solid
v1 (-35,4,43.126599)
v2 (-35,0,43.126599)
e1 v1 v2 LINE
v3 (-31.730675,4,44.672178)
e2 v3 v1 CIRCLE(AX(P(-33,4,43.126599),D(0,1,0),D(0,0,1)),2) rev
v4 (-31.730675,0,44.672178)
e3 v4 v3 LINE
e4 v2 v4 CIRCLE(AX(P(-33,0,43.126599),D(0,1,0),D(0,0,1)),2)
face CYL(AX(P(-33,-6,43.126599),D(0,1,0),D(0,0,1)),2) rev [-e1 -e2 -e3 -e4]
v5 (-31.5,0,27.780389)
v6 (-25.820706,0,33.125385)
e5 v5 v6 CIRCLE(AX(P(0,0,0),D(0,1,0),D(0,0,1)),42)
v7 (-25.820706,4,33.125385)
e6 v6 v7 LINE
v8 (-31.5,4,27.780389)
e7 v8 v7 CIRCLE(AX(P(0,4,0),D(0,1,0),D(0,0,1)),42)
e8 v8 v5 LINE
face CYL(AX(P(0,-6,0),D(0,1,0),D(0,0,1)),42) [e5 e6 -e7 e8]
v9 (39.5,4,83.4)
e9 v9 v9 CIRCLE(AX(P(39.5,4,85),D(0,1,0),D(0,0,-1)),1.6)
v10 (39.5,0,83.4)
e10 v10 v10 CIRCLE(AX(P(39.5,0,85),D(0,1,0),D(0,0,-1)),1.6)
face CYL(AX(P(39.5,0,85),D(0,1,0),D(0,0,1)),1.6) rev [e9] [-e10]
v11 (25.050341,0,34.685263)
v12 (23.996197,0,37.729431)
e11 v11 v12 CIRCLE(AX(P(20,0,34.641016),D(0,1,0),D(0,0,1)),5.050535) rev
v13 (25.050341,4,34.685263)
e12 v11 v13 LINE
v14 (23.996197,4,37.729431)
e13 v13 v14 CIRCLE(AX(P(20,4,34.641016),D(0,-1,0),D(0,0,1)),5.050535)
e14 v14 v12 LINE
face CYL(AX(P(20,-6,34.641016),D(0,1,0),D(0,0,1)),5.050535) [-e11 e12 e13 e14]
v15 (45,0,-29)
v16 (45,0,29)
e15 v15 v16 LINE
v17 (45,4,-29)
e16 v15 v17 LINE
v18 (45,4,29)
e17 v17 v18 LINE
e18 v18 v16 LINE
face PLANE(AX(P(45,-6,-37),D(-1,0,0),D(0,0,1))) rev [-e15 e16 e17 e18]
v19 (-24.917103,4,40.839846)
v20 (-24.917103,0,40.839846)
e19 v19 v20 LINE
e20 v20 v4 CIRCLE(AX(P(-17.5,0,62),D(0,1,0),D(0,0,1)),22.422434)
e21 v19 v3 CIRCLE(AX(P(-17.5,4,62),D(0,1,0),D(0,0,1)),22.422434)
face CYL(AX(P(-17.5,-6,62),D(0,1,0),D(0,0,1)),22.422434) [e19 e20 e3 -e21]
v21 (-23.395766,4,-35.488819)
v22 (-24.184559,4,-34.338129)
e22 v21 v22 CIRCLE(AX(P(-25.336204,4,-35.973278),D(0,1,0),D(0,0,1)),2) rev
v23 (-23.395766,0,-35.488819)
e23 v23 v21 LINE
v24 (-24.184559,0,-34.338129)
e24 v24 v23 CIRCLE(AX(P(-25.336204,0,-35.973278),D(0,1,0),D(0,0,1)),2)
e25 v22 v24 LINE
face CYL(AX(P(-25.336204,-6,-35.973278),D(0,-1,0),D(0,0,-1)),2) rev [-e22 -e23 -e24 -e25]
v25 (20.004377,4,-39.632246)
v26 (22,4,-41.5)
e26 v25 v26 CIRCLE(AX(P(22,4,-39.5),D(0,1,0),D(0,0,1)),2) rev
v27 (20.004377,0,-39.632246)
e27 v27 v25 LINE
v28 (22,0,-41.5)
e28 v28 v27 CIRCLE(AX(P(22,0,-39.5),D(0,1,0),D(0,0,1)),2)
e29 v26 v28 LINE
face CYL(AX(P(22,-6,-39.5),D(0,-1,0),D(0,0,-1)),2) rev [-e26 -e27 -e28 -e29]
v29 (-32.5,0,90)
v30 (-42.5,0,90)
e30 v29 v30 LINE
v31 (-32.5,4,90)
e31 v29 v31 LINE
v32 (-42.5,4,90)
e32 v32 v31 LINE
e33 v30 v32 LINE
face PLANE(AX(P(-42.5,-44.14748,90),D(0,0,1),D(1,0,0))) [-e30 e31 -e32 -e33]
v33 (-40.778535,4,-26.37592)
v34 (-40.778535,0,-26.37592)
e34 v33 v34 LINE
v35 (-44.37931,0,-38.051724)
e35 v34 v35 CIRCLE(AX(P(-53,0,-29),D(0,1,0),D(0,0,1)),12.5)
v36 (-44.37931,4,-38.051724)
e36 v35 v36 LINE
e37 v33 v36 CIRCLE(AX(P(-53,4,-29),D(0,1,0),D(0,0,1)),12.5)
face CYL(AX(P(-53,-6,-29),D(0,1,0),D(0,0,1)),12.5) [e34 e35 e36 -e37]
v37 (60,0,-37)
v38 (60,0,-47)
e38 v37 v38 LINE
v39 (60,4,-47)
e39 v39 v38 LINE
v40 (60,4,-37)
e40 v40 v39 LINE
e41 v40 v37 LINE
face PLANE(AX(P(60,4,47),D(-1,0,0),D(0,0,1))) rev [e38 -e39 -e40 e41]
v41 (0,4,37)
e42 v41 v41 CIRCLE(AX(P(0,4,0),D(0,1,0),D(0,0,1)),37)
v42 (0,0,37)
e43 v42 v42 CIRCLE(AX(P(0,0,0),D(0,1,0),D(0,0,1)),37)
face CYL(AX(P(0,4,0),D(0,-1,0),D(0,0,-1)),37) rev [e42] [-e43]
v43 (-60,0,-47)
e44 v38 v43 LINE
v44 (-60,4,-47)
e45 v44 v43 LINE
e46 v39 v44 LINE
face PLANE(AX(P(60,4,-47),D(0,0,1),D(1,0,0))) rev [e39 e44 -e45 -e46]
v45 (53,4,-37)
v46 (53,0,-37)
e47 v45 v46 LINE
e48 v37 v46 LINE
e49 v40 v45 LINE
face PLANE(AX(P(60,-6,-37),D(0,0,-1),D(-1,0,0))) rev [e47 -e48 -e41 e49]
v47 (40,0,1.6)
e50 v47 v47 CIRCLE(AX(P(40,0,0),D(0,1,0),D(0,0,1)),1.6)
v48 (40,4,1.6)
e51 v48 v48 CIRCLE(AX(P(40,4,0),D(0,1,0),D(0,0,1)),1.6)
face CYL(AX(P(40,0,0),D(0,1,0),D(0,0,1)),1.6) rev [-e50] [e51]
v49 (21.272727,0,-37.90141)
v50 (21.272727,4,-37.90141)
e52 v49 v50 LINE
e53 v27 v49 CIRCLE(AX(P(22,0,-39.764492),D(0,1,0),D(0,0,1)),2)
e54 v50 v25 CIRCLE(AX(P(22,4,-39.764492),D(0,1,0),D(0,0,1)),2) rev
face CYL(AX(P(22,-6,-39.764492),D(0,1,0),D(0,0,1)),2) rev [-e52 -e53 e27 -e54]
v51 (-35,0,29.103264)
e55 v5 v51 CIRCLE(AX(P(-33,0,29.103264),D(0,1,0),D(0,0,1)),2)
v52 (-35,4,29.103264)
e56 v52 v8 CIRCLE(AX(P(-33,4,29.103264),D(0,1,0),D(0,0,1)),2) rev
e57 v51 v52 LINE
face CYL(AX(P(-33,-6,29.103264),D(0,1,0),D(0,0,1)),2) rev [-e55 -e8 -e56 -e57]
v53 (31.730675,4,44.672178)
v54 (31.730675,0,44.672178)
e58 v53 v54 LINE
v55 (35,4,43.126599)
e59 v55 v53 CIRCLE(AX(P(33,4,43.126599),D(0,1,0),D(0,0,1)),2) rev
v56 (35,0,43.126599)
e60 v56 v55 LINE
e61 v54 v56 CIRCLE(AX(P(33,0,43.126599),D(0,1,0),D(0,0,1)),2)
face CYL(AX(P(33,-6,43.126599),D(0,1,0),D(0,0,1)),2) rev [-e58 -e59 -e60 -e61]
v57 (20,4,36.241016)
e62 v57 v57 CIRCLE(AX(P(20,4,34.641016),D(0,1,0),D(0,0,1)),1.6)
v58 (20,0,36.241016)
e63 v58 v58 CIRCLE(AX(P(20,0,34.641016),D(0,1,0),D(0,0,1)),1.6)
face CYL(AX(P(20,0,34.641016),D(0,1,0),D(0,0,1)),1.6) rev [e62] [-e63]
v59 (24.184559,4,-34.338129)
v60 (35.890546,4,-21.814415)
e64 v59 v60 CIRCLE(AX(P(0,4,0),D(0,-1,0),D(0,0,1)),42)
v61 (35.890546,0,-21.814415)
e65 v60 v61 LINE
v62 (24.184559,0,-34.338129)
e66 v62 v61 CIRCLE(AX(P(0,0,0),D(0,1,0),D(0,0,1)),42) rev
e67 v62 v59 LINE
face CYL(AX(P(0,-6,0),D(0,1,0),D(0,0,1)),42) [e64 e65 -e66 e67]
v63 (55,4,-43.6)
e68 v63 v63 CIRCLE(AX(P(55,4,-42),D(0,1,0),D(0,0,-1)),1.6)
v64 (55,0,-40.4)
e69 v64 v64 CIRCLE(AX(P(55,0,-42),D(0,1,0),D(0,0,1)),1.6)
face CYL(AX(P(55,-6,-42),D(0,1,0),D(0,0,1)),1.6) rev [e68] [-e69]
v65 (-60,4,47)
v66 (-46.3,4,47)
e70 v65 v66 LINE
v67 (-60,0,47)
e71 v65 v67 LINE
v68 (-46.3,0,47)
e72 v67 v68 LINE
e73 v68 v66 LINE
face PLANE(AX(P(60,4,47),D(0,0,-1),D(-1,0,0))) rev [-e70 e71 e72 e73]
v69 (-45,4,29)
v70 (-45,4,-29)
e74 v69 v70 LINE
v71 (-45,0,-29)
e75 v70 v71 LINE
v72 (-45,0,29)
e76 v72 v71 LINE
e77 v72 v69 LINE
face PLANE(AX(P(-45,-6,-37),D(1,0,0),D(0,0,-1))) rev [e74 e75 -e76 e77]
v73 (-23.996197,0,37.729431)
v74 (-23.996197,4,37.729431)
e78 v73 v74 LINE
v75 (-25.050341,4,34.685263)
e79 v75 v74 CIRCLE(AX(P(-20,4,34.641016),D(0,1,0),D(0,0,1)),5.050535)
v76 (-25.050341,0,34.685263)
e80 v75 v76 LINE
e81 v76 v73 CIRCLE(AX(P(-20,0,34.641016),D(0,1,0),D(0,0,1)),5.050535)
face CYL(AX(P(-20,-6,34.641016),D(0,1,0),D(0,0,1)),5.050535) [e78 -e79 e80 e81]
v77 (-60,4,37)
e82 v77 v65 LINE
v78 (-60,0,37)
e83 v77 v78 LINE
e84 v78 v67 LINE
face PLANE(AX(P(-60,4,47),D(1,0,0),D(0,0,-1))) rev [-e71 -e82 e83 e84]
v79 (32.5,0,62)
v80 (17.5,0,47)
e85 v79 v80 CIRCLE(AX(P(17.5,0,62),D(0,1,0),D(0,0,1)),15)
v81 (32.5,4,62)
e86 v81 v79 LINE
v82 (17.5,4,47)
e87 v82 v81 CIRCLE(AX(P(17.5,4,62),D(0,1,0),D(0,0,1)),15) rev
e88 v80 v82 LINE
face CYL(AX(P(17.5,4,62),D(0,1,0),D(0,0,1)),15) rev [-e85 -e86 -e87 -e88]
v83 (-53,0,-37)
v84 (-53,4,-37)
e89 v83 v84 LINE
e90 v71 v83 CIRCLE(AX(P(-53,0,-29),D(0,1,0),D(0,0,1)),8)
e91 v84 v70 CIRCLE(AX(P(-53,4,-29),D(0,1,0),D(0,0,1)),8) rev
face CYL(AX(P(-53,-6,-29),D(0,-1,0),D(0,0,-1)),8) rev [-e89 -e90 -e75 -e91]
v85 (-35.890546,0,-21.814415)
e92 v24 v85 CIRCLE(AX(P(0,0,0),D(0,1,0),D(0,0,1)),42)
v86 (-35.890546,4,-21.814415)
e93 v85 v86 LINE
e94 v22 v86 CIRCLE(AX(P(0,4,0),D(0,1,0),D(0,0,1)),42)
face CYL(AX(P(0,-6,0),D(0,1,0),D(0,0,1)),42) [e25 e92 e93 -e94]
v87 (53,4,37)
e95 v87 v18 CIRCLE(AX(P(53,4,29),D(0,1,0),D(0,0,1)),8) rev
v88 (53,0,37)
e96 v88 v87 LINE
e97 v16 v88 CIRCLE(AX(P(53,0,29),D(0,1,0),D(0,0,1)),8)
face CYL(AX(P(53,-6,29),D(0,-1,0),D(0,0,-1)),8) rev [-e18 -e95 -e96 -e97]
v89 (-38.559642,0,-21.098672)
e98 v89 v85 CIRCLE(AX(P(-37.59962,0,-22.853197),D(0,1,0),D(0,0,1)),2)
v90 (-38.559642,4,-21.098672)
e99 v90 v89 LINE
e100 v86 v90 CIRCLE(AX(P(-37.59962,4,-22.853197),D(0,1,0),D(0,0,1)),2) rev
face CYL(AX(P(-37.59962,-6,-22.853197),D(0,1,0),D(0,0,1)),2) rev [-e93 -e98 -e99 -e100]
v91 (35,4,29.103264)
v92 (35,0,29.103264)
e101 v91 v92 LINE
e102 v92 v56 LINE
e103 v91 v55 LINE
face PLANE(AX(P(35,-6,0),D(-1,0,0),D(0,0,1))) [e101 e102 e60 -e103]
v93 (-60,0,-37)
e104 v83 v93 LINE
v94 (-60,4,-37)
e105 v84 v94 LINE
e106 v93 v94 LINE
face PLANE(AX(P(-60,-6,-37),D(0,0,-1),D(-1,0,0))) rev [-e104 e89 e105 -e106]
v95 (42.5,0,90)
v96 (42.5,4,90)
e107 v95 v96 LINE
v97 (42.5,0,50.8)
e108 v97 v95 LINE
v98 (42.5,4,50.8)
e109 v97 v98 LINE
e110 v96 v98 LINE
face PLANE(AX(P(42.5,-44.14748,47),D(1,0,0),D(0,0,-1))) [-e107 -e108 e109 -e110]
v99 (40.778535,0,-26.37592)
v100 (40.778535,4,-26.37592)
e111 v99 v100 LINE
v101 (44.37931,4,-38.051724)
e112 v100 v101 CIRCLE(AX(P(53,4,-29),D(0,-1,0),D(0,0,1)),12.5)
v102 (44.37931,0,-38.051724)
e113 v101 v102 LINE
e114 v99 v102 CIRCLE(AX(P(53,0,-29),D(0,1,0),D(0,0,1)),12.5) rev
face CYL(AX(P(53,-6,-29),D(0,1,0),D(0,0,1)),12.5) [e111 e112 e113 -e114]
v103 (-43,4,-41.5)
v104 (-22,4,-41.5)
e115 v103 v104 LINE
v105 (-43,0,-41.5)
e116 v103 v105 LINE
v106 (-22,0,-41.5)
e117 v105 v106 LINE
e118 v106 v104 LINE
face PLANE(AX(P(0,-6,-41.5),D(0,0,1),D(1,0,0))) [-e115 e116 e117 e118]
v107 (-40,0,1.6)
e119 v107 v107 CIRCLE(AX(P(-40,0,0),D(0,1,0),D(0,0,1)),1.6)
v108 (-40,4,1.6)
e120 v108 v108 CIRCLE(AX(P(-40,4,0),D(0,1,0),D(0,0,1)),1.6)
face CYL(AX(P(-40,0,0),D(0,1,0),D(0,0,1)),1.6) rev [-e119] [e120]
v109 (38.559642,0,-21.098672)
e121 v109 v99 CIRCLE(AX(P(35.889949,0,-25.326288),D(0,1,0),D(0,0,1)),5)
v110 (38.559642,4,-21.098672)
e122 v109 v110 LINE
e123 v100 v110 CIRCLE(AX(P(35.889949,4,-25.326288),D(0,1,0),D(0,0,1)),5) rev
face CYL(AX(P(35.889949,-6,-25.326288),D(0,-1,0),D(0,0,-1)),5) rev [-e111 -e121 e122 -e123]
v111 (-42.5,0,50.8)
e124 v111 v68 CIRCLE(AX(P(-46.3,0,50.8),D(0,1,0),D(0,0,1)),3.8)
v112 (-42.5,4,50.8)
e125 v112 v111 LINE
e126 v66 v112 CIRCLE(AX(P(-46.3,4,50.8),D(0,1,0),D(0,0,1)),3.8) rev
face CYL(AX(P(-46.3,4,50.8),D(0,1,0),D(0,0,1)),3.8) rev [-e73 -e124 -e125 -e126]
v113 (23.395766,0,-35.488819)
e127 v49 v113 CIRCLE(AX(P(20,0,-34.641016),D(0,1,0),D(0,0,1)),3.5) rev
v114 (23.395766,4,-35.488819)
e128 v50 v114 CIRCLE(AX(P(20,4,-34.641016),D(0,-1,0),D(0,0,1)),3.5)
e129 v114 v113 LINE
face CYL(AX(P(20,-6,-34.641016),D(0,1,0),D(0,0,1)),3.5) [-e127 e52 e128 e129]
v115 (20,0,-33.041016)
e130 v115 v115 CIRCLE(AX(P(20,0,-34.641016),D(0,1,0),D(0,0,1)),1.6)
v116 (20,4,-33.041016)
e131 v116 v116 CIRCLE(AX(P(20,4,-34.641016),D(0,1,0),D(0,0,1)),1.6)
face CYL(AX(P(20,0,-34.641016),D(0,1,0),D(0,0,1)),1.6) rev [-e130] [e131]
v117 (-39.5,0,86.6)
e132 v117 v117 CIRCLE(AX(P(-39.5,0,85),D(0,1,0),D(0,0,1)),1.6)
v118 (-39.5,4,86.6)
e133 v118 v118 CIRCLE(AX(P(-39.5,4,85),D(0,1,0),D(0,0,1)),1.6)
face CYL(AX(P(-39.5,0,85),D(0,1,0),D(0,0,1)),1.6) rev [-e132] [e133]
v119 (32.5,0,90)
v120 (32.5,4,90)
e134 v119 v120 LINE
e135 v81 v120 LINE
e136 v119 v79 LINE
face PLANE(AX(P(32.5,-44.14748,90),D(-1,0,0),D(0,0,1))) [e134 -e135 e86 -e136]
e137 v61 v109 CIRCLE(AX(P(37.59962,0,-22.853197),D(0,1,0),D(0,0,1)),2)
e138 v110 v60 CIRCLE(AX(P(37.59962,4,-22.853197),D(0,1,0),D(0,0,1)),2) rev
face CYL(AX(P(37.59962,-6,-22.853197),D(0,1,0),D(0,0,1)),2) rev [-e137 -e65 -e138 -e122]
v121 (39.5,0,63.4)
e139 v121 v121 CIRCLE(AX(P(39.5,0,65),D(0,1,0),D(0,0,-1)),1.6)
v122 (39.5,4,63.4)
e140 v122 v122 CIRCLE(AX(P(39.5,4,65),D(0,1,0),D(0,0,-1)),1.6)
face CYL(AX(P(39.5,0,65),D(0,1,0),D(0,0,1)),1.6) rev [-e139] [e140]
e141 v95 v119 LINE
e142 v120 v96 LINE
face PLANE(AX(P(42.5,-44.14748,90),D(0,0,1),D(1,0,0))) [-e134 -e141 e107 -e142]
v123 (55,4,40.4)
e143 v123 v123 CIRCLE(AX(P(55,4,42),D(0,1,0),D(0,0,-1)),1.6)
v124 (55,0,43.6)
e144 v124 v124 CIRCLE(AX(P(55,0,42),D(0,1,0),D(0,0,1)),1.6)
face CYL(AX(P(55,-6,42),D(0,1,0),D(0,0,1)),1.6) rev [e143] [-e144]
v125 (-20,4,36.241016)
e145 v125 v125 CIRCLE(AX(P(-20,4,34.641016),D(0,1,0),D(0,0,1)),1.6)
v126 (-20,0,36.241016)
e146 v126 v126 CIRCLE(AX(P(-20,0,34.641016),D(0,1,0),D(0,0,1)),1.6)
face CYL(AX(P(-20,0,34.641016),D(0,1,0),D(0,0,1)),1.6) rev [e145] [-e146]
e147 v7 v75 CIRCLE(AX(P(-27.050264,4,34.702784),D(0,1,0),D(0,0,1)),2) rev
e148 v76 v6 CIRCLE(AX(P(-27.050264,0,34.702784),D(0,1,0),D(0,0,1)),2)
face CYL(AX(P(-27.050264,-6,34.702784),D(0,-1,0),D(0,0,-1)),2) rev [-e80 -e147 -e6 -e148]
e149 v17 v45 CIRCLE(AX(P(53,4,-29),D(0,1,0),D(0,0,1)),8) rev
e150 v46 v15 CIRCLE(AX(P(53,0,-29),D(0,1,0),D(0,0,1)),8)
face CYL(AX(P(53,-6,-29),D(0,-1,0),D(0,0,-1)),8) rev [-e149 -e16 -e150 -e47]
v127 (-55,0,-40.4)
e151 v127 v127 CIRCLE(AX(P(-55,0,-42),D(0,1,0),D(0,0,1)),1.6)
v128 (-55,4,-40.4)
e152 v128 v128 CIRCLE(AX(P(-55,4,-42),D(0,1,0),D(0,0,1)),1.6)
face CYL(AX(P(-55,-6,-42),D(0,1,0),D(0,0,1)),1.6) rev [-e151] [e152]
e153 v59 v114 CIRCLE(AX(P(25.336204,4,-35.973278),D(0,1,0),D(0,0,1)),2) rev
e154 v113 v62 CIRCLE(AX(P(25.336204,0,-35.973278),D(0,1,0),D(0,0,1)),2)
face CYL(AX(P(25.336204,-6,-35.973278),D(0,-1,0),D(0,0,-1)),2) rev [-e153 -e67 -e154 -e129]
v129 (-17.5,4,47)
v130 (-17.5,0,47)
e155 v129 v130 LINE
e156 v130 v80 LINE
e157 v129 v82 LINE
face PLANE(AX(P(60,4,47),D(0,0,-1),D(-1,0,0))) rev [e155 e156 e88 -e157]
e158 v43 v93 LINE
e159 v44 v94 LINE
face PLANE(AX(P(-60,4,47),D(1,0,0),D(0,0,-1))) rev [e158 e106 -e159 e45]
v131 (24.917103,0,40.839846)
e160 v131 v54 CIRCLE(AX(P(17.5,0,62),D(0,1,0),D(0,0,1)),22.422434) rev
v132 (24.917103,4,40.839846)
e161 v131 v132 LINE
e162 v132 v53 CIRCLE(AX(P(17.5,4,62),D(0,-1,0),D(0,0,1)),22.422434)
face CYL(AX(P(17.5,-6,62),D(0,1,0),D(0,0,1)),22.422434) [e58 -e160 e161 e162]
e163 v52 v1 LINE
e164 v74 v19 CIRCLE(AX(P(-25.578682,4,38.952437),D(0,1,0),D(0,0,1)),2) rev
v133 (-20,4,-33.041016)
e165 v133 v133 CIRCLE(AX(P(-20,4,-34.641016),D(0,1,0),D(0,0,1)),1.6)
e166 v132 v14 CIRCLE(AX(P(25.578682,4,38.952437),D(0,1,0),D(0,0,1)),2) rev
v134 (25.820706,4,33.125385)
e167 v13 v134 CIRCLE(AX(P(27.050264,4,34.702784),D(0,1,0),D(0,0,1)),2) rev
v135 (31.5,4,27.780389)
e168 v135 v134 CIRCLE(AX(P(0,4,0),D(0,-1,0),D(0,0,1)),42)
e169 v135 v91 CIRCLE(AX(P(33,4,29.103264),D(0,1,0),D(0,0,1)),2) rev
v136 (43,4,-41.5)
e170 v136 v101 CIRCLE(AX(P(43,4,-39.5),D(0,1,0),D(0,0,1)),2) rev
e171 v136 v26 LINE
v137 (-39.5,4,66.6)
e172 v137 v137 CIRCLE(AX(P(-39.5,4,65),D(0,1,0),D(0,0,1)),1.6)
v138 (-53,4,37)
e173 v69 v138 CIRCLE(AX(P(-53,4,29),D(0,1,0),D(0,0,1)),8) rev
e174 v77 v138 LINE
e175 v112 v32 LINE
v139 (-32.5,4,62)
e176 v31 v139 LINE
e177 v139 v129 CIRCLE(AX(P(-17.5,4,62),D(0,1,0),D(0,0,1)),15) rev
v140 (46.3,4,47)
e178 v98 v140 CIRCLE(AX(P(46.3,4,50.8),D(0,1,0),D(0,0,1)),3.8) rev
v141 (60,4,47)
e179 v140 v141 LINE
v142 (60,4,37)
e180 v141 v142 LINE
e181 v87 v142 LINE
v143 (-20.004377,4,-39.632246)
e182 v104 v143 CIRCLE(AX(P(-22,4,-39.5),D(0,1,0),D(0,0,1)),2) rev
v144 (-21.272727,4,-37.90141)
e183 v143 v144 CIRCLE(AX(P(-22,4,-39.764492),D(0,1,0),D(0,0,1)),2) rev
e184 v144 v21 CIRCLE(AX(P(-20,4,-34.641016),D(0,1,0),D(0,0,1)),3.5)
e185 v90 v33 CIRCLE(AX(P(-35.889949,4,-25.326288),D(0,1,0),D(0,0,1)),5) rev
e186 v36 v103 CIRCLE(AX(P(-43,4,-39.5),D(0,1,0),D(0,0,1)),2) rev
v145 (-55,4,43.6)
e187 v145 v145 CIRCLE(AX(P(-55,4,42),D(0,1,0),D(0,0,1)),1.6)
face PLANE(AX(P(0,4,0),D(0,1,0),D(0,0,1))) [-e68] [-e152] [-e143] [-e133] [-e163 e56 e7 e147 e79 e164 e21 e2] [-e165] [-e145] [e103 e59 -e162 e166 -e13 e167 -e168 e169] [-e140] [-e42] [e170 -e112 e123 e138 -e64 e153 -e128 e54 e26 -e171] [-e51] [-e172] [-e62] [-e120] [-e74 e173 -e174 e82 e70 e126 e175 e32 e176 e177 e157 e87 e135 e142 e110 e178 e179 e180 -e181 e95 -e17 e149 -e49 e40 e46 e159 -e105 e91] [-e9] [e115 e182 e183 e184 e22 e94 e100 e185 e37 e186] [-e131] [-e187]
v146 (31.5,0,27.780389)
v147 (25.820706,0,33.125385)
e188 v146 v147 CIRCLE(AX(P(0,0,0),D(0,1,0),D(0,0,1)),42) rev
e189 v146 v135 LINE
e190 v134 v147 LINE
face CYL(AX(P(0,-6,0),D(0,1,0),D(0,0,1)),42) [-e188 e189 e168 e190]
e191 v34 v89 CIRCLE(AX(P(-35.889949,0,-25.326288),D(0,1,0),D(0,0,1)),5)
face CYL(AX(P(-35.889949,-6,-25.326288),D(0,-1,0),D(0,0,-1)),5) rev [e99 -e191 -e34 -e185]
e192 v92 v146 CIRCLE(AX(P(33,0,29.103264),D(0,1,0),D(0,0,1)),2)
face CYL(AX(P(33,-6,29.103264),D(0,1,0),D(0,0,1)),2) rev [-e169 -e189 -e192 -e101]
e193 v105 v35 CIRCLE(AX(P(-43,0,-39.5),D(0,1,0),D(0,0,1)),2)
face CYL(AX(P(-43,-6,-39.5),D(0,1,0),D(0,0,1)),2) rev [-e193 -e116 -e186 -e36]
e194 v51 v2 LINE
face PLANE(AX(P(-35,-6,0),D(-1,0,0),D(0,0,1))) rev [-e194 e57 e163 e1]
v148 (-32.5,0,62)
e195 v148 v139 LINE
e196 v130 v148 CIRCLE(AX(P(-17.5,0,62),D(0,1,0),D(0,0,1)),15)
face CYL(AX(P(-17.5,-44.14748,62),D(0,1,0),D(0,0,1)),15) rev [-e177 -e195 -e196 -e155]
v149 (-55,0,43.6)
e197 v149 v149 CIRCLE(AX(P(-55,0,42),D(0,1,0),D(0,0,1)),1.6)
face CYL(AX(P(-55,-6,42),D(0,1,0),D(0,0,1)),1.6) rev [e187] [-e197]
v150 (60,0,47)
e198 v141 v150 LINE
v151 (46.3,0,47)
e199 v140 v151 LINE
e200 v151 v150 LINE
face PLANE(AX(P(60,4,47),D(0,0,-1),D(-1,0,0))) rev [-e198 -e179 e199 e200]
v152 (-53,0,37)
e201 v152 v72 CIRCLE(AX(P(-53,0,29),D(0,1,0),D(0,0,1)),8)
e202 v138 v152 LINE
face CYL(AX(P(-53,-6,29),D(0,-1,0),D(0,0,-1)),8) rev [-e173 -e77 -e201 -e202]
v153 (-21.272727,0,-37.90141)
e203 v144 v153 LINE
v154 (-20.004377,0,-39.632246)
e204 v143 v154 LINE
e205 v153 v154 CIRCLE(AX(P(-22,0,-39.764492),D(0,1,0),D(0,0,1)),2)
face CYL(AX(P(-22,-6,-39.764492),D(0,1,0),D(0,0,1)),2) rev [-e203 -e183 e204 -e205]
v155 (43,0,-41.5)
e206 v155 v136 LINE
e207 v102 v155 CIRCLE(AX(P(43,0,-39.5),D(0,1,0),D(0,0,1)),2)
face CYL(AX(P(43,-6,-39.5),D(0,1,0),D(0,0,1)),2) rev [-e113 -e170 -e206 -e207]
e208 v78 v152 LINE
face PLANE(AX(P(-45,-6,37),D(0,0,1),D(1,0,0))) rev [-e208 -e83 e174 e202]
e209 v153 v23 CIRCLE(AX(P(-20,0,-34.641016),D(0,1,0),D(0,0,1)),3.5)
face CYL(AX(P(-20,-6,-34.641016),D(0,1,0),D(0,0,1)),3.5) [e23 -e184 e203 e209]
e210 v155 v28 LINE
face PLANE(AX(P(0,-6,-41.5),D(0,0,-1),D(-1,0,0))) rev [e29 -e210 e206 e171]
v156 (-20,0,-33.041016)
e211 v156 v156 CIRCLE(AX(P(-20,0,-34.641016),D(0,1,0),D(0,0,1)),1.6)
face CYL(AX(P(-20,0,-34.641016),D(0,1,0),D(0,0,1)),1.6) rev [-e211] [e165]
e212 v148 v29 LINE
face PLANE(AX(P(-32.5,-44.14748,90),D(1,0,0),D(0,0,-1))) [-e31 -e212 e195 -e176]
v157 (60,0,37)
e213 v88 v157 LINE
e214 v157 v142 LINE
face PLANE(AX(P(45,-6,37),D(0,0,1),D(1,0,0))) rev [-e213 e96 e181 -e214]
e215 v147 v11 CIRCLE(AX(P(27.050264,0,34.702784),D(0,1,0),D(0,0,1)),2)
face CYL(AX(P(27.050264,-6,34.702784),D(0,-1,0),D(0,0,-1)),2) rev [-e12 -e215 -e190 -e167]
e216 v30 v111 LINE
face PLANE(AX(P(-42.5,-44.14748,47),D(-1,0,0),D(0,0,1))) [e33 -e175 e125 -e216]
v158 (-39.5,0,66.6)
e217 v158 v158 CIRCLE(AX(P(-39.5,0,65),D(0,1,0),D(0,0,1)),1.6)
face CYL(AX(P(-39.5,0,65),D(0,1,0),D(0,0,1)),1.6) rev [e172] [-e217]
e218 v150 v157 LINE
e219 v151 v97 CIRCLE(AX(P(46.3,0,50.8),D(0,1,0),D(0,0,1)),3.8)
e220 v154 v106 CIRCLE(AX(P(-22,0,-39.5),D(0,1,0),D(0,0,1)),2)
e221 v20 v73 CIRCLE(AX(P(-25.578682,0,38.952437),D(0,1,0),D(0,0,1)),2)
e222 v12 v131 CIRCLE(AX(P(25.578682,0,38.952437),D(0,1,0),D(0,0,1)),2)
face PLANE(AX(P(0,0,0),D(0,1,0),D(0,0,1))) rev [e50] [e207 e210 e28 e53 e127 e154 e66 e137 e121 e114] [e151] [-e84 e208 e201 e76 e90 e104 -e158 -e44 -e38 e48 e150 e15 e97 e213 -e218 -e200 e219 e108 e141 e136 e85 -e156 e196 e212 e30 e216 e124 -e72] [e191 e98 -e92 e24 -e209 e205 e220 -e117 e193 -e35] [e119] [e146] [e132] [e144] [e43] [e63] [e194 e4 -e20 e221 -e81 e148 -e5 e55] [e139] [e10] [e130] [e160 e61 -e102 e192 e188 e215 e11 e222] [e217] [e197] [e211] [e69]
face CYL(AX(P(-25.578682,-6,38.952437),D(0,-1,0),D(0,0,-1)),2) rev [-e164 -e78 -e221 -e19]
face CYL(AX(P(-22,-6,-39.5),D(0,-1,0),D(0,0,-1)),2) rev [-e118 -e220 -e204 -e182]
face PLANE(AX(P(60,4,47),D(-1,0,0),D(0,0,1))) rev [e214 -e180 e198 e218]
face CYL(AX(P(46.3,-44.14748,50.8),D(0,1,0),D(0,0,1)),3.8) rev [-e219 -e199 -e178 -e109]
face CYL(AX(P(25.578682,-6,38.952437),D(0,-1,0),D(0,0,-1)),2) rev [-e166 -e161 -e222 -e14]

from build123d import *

# Parameters (mm, degrees)
SKETCH_1_W          = 120
SKETCH_1_H          = 94
SKETCH_1_R          = 37
EXTRUDE_2_DEPTH     = 4
SKETCH_2_W          = 15
SKETCH_2_H          = 74
CUT_EXTRUDE_1_DEPTH = 10
FILLET_1_R          = 8
FILLET_2_R          = 8
SKETCH_5_R          = 1.6
CUT_EXTRUDE_2_DEPTH = 10
SKETCH_6_W          = 10
SKETCH_6_H          = 43
EXTRUDE_3_DEPTH     = 4
FILLET_3_R          = 3.8
FILLET_4_R          = 15
SKETCH_7_R          = 1.6
CUT_EXTRUDE_3_DEPTH = 109.240473022
CUT_EXTRUDE_4_DEPTH = 10
FILLET_5_DEPTH      = 4
FILLET_6_R          = 5
MIRROR_1_DEPTH      = 4
SKETCH_10_R         = 1.6
CUT_EXTRUDE_6_DEPTH = 109.240473022


with BuildPart() as part:
    # 草图1 → 凸台-拉伸2 (new body)
    with BuildSketch(Plane(origin=(0, 0, 0), x_dir=(1, 0, 0), z_dir=(0, 1, 0))):
        Rectangle(SKETCH_1_W, SKETCH_1_H)
        with Locations(Location((0, 0, 0), (0, 0, 270))):
            Circle(SKETCH_1_R, mode=Mode.SUBTRACT)
    extrude(amount=EXTRUDE_2_DEPTH)

    # 草图2 → 切除-拉伸1 (cut)
    with BuildSketch(Plane(origin=(0, 4, 0), x_dir=(1, 0, 0), z_dir=(0, 1, 0))):
        with Locations((-52.5, 0)):
            Rectangle(SKETCH_2_W, SKETCH_2_H)
        with Locations((52.5, 0)):
            Rectangle(SKETCH_2_W, SKETCH_2_H)
    extrude(amount=-CUT_EXTRUDE_1_DEPTH, mode=Mode.SUBTRACT)

    # 圆角1
    fillet_1_edges = [part.edges().sort_by_distance(p)[0] for p in [
        (-45, 2, -37),
        (45, 2, -37),
    ]]
    fillet(fillet_1_edges, radius=FILLET_1_R)

    # 圆角2
    fillet_2_edges = [part.edges().sort_by_distance(p)[0] for p in [
        (-45, 2, 37),
        (45, 2, 37),
    ]]
    fillet(fillet_2_edges, radius=FILLET_2_R)

    # 草图5 → 切除-拉伸2 (cut)
    with BuildSketch(Plane(origin=(0, 4, 0), x_dir=(1, 0, 0), z_dir=(0, 1, 0))):
        with Locations(Location((-55, 42, 0), (0, 0, 270))):
            Circle(SKETCH_5_R)
        with Locations(Location((-55, -42, 0), (0, 0, 270))):
            Circle(SKETCH_5_R)
        with Locations(Location((55, -42, 0), (0, 0, 270))):
            Circle(SKETCH_5_R)
        with Locations(Location((55, 42, 0), (0, 0, 270))):
            Circle(SKETCH_5_R)
    extrude(amount=-CUT_EXTRUDE_2_DEPTH, mode=Mode.SUBTRACT)

    # 草图6 → 凸台-拉伸3 (add)
    with BuildSketch(Plane(origin=(0, 4, 0), x_dir=(1, 0, 0), z_dir=(0, 1, 0))):
        with Locations((-37.5, -68.5)):
            Rectangle(SKETCH_6_W, SKETCH_6_H)
        with Locations((37.5, -68.5)):
            Rectangle(SKETCH_6_W, SKETCH_6_H)
    extrude(amount=-EXTRUDE_3_DEPTH)

    # 圆角3
    fillet_3_edges = [part.edges().sort_by_distance(p)[0] for p in [
        (-42.5, 2, 47),
        (42.5, 2, 47),
    ]]
    fillet(fillet_3_edges, radius=FILLET_3_R)

    # 圆角4
    fillet_4_edges = [part.edges().sort_by_distance(p)[0] for p in [
        (-32.5, 2, 47),
        (32.5, 2, 47),
    ]]
    fillet(fillet_4_edges, radius=FILLET_4_R)

    # 草图7 → 切除-拉伸3 (cut, through all)
    with BuildSketch(Plane(origin=(0, 4, 0), x_dir=(1, 0, 0), z_dir=(0, 1, 0))):
        with Locations(Location((-20, 34.641016151, 0), (0, 0, 270))):
            Circle(SKETCH_7_R)
        with Locations(Location((20, 34.641016151, 0), (0, 0, 270))):
            Circle(SKETCH_7_R)
        with Locations(Location((40, 0, 0), (0, 0, 270))):
            Circle(SKETCH_7_R)
        with Locations(Location((20, -34.641016151, 0), (0, 0, 270))):
            Circle(SKETCH_7_R)
        with Locations(Location((-20, -34.641016151, 0), (0, 0, 270))):
            Circle(SKETCH_7_R)
        with Locations(Location((-40, 0, 0), (0, 0, 270))):
            Circle(SKETCH_7_R)
    extrude(amount=-CUT_EXTRUDE_3_DEPTH, mode=Mode.SUBTRACT)

    # 草图8 → 切除-拉伸4 (cut)
    with BuildSketch(Plane(origin=(0, 4, 0), x_dir=(1, 0, 0), z_dir=(0, 1, 0))):
        with BuildLine():
            Line((-20, 41.5), (-53, 41.5))
            ThreePointArc((-53, 41.5), (-42.247051947, 35.373704431), (-42.034221976, 22.999857308))
            Line((-42.034221976, 22.999857308), (-36.845014161, 20.160479446))
            ThreePointArc((-36.845014161, 20.160479446), (-31.047174279, 28.285561145), (-23.495769227, 34.813055431))
            ThreePointArc((-23.495769227, 34.813055431), (-22.413282259, 37.175985331), (-20, 38.141016151))
            Line((-20, 38.141016151), (-20, 41.5))
        make_face()
        with BuildLine():
            ThreePointArc((-24.974500131, -33.76794846), (-30.447809443, -28.929758038), (-35, -23.216373532))
            Line((-35, -23.216373532), (-35, -47.981599748))
            ThreePointArc((-35, -47.981599748), (-28.117207257, -42.250558092), (-19.540408864, -39.670596128))
            ThreePointArc((-19.540408864, -39.670596128), (-23.715698209, -38.061759575), (-24.974500131, -33.76794846))
        make_face()
    extrude(amount=-CUT_EXTRUDE_4_DEPTH, mode=Mode.SUBTRACT)

    # 圆角5: read off the stored shape, not the designer's step
    # 圆角5 outline → 圆角5 (add)
    with BuildSketch(Plane(origin=(0, 0, 0), x_dir=(1, 0, 0), z_dir=(0, 1, 0))):
        with BuildLine():
            ThreePointArc((-19.540408738, -39.670596116), (-22.017157734, -39.271240058), (-23.996197034, -37.729431281))
            ThreePointArc((-23.996197034, -37.729431281), (-23.660968385, -39.520217427), (-24.917103069, -40.839845755))
            ThreePointArc((-24.917103069, -40.839845755), (-22.264757976, -40.089668486), (-19.540408738, -39.670596116))
        make_face()
        with BuildLine():
            ThreePointArc((-25.820706479, -33.125384782), (-25.257029121, -33.817171884), (-25.050340682, -34.685262575))
            ThreePointArc((-25.050340682, -34.685262575), (-25.033361166, -34.224874204), (-24.974500131, -33.76794846))
            ThreePointArc((-24.974500131, -33.76794846), (-25.399635345, -33.449342659), (-25.820706479, -33.125384782))
        make_face()
        with BuildLine():
            ThreePointArc((-35, -47.981599748), (-33.451395129, -46.241873872), (-31.730675246, -44.672177642))
            ThreePointArc((-31.730675246, -44.672177642), (-33.854795441, -44.934725986), (-35, -43.12659857))
            Line((-35, -43.12659857), (-35, -47.981599748))
        make_face()
        with BuildLine():
            ThreePointArc((-35, -29.103264422), (-33.707106781, -27.232435728), (-31.5, -27.780388766))
            ThreePointArc((-31.5, -27.780388766), (-33.328217156, -25.55836343), (-35, -23.216373532))
            Line((-35, -23.216373532), (-35, -29.103264422))
        make_face()
        with BuildLine():
            Line((-20, 41.5), (-22, 41.5))
            ThreePointArc((-22, 41.5), (-20.633341947, 40.960221136), (-20.004377025, 39.632245767))
            ThreePointArc((-20.004377025, 39.632245767), (-20.386776912, 38.582327726), (-21.272727273, 37.901409577))
            ThreePointArc((-21.272727273, 37.901409577), (-20.647542667, 38.080592941), (-20, 38.141016151))
            Line((-20, 38.141016151), (-20, 41.5))
        make_face()
        with BuildLine():
            ThreePointArc((-44.379310345, 38.051724138), (-44.856953382, 40.242781353), (-43, 41.5))
            Line((-43, 41.5), (-53, 41.5))
            ThreePointArc((-53, 41.5), (-48.357616546, 40.605958636), (-44.379310345, 38.051724138))
        make_face()
        with BuildLine():
            ThreePointArc((-23.495769227, 34.813055431), (-23.462294071, 35.153382983), (-23.395766463, 35.488819274))
            ThreePointArc((-23.395766463, 35.488819274), (-23.686578053, 34.842467526), (-24.184558784, 34.338129192))
            ThreePointArc((-24.184558784, 34.338129192), (-23.841346618, 34.577307464), (-23.495769227, 34.813055431))
        make_face()
        with BuildLine():
            ThreePointArc((-35.890546019, 21.814415107), (-37.081603023, 20.921446591), (-38.55964247, 21.098672295))
            Line((-38.55964247, 21.098672295), (-36.845014161, 20.160479446))
            ThreePointArc((-36.845014161, 20.160479446), (-36.377181096, 20.992872494), (-35.890546019, 21.814415107))
        make_face()
    extrude(amount=FILLET_5_DEPTH)

    # 圆角6
    # the kernel refuses this fillet: 5 mm, written as the material it adds along each edge
    with BuildSketch(Plane(origin=(-42.034221976, 4, -22.999857308), x_dir=(0.8772622419285397, 0, 0.48001141537104314), z_dir=(0, -1, 0))) as fillet_6_piece_1:
        with BuildLine():
            CenterArc((4.273425175, -4.99021121), FILLET_6_R, 93.585816178, 69.846074329)
            ThreePointArc((-0.518982018, -3.564436578), (-0.130425942, -1.801010165), (0, 0))
            Line((0, 0), (3.960707916, 0))
        make_face()
    extrude(amount=4)

    # 镜向1: read off the stored shape, not the designer's step
    # 镜向1 outline → 镜向1 (cut)
    with BuildSketch(Plane(origin=(0, 0, 0), x_dir=(1, 0, 0), z_dir=(0, 1, 0))):
        with BuildLine():
            ThreePointArc((31.5, -27.780388766), (28.78468505, -30.584994795), (25.820706479, -33.125384782))
            ThreePointArc((25.820706479, -33.125384782), (25.257029121, -33.817171884), (25.050340682, -34.685262575))
            ThreePointArc((25.050340682, -34.685262575), (24.77249431, -36.293649447), (23.996197034, -37.729431281))
            ThreePointArc((23.996197034, -37.729431281), (23.660968385, -39.520217427), (24.917103069, -40.839845755))
            ThreePointArc((24.917103069, -40.839845755), (28.492191247, -42.456784369), (31.730675246, -44.672177642))
            ThreePointArc((31.730675246, -44.672177642), (33.854795441, -44.934725986), (35, -43.12659857))
            Line((35, -43.12659857), (35, -29.103264422))
            ThreePointArc((35, -29.103264422), (33.707106781, -27.232435728), (31.5, -27.780388766))
        make_face()
        with BuildLine():
            ThreePointArc((24.184558784, 34.338129192), (30.683308295, 28.679863879), (35.890546019, 21.814415107))
            ThreePointArc((35.890546019, 21.814415107), (37.081603023, 20.921446591), (38.55964247, 21.098672295))
            ThreePointArc((38.55964247, 21.098672295), (40.499095767, 23.388308225), (40.778535058, 26.375920225))
            ThreePointArc((40.778535058, 26.375920225), (41.05512866, 32.683754699), (44.379310345, 38.051724138))
            ThreePointArc((44.379310345, 38.051724138), (44.856953382, 40.242781353), (43, 41.5))
            Line((43, 41.5), (22, 41.5))
            ThreePointArc((22, 41.5), (20.633341947, 40.960221136), (20.004377025, 39.632245767))
            ThreePointArc((20.004377025, 39.632245767), (20.386776912, 38.582327726), (21.272727273, 37.901409577))
            ThreePointArc((21.272727273, 37.901409577), (22.627519064, 36.953189062), (23.395766462, 35.488819274))
            ThreePointArc((23.395766462, 35.488819274), (23.686578053, 34.842467526), (24.184558784, 34.338129192))
        make_face()
    extrude(amount=MIRROR_1_DEPTH, mode=Mode.SUBTRACT)

    # 草图10 → 切除-拉伸6 (cut, through all)
    with BuildSketch(Plane(origin=(0, 4, 0), x_dir=(1, 0, 0), z_dir=(0, 1, 0))):
        with Locations(Location((-39.5, -85, 0), (0, 0, 270))):
            Circle(SKETCH_10_R)
        with Locations(Location((-39.5, -65, 0), (0, 0, 270))):
            Circle(SKETCH_10_R)
        with Locations(Location((39.5, -65, 0), (0, 0, 90))):
            Circle(SKETCH_10_R)
        with Locations(Location((39.5, -85, 0), (0, 0, 90))):
            Circle(SKETCH_10_R)
    extrude(amount=-CUT_EXTRUDE_6_DEPTH, mode=Mode.SUBTRACT)


solid = part.part
